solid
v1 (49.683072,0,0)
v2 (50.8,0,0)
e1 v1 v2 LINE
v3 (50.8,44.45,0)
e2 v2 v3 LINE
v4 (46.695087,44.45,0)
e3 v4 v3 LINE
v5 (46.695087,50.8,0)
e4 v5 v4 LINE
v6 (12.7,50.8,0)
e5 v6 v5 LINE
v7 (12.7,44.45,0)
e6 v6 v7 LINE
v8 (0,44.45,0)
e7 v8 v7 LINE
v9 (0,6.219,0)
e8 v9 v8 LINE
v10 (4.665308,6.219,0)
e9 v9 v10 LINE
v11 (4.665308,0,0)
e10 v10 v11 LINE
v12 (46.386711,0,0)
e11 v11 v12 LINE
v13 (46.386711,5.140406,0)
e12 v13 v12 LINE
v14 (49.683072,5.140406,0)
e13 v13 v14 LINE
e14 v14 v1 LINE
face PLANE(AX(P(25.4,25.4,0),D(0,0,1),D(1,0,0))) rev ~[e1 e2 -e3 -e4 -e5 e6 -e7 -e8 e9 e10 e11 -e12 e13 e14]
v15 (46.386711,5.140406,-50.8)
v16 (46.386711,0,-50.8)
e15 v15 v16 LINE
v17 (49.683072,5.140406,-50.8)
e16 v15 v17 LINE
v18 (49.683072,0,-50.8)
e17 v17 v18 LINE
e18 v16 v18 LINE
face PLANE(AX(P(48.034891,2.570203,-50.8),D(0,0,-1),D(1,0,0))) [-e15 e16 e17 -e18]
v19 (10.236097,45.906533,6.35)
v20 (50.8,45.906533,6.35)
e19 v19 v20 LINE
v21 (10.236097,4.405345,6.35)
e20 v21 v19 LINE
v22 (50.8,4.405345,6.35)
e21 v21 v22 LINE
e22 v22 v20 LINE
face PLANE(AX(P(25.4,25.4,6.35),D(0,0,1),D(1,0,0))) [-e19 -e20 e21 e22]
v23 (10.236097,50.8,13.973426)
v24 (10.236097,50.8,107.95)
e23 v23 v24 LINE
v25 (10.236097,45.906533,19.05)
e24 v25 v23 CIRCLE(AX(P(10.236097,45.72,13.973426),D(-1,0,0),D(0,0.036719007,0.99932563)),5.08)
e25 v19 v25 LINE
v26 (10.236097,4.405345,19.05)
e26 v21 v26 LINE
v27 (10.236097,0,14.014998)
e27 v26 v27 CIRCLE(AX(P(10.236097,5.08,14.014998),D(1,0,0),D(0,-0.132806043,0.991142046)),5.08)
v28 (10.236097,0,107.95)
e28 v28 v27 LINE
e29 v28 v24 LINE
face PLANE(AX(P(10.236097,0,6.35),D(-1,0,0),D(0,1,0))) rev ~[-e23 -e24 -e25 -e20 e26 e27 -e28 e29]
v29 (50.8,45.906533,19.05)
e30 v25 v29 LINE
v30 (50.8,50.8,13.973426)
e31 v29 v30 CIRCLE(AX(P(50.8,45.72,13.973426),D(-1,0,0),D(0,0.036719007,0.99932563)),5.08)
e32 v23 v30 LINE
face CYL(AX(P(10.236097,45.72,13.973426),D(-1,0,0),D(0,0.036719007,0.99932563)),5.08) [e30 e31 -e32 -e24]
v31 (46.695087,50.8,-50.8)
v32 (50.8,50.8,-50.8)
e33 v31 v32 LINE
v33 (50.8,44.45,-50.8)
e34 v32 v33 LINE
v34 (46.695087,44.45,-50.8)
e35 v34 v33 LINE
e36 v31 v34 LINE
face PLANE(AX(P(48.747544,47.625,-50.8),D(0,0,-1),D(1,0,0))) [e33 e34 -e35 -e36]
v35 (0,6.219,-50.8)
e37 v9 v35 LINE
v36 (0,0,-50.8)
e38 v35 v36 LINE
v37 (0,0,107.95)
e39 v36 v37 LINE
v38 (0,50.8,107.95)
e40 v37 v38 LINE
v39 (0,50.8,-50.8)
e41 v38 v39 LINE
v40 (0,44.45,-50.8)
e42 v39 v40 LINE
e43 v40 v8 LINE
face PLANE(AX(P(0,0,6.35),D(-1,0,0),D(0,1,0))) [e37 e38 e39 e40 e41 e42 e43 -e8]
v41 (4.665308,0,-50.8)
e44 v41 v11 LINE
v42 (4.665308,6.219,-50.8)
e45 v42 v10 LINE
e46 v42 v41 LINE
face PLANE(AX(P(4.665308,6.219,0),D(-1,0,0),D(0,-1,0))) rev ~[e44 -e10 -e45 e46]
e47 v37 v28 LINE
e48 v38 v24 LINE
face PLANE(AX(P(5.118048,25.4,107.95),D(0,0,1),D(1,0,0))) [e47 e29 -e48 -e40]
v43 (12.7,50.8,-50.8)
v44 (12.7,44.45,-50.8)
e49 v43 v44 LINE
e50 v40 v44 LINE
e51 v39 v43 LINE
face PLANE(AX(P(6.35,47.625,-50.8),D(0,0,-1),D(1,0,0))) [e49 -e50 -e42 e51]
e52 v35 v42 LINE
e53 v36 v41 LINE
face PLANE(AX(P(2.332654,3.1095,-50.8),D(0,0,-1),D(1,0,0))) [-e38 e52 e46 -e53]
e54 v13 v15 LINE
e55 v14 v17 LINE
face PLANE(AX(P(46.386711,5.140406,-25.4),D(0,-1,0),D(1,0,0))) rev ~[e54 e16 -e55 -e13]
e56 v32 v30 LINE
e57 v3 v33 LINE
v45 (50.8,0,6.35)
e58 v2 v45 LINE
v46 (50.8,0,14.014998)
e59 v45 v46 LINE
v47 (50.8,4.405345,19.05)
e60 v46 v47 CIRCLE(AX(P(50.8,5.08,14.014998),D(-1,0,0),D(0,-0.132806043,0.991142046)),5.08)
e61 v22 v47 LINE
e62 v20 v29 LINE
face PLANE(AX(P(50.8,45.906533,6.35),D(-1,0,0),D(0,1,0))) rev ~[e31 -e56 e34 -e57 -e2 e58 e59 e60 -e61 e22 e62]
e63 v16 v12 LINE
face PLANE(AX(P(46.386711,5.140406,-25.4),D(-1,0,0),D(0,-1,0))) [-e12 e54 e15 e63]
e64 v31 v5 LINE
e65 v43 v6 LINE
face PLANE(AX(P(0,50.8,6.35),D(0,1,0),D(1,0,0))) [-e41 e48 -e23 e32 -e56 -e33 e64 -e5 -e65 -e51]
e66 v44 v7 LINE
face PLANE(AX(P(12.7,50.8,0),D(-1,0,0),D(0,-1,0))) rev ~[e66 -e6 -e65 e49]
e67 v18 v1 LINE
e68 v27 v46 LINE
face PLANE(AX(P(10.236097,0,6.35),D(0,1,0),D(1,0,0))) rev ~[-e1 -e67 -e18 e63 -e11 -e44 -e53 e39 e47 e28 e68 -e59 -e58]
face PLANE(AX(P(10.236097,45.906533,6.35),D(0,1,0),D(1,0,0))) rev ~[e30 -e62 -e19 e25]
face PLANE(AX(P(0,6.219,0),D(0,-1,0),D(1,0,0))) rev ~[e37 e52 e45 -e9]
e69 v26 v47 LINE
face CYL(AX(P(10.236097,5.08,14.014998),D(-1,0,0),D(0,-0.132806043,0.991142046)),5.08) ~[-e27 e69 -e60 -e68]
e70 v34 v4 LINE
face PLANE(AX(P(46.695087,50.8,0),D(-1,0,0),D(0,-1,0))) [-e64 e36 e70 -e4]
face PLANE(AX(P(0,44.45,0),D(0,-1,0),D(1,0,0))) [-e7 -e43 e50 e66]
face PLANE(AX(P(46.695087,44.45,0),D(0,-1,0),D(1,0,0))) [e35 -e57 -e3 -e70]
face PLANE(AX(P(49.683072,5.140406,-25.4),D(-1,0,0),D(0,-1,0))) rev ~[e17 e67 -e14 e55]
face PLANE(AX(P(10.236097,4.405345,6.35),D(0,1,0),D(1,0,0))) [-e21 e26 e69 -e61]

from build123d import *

# Parameters (mm, degrees)
F0_W         = 50.8
F0_H         = 50.8
F1_DEPTH     = 6.35
F2_W         = 3.2963603735
F2_H         = 5.1404060796
F2_W_2       = 4.6653077006
F2_H_2       = 6.2190000899
F2_W_3       = 4.104912895
F2_H_3       = 6.35
F2_W_4       = 12.7
F3_DEPTH     = 25.4
F4_DEPTH     = 25.4
F5_W         = 10.2360965684
F5_H         = 50.8
F6_DEPTH     = 101.6
F7_W         = 40.5639034316
F7_H         = 4.4053453021
F8_DEPTH     = 12.7
F9_W         = 40.5639034316
F9_H         = 4.8934674442
F10_DEPTH    = 12.7
F11_T1_DEPTH = 53.1514074134
F12_T1_DEPTH = 53.255338931


# Not quite as in the source:
# - a fillet or chamfer that OpenCascade refuses, or shapes differently, is made with other operations: its cross-section is extruded or revolved along the edge and cut away or added


with BuildPart() as f1:
    # F0 (on Top) → F1 (new body)
    with BuildSketch(Plane.XY):
        with Locations((25.4, 25.4)):
            Rectangle(F0_W, F0_H)
    extrude(amount=F1_DEPTH)

    # F2 (on face) → F3 (join)
    with BuildSketch(Plane(origin=(0, 0, 0), x_dir=(1, 0, 0), z_dir=(0, 0, -1))):
        with Locations((48.0348914862, -2.5702030398)):
            Rectangle(F2_W, F2_H)
        with Locations((2.3326538503, -3.109500045)):
            Rectangle(F2_W_2, F2_H_2)
        with Locations((48.7475435525, -47.625)):
            Rectangle(F2_W_3, F2_H_3)
        with Locations((6.35, -47.625)):
            Rectangle(F2_W_4, F2_H_3)
    extrude(amount=F3_DEPTH)

    # F4 (add): faces of the model
    f4_faces = [f1.faces().sort_by_distance(p)[0] for p in [
        (48.0348914862, 2.5702030398, -25.4),
        (2.3326538503, 3.109500045, -25.4),
        (6.35, 47.625, -25.4),
        (48.7475435525, 47.625, -25.4),
    ]]
    extrude(f4_faces, amount=F4_DEPTH)

    # F5 (on face) → F6 (join)
    with BuildSketch(Plane.XY.offset(6.35)):
        with Locations((5.1180482842, 25.4)):
            Rectangle(F5_W, F5_H)
    extrude(amount=F6_DEPTH)

    # F7 (on face) → F8 (join)
    with BuildSketch(Plane.XY.offset(6.35)):
        with Locations((30.5180482842, 2.202672651)):
            Rectangle(F7_W, F7_H)
    extrude(amount=F8_DEPTH)

    # F9 (on face) → F10 (join)
    with BuildSketch(Plane.XY.offset(6.35)):
        with Locations((30.5180482842, 48.3532662779)):
            Rectangle(F9_W, F9_H)
    extrude(amount=F10_DEPTH)

    # F11: fillet of radius 5.08 on 1 edges, made by hand

    # F11_s2 → F11_t1 (cut)
    with BuildSketch(Plane.YZ.offset(10.2360965684)):
        with BuildLine():
            ThreePointArc((4.4053453021, 19.05), (1.2568046175, 17.3600809275), (0, 14.0149984073))
            Line((0, 14.0149984073), (0, 19.05))
            Line((0, 19.05), (4.4053453021, 19.05))
        make_face()
    extrude(amount=F11_T1_DEPTH, mode=Mode.SUBTRACT)

    # F12: fillet of radius 5.08 on 1 edges, made by hand

    # F12_s2 → F12_t1 (cut)
    with BuildSketch(Plane.YZ.offset(10.2360965684)):
        with BuildLine():
            ThreePointArc((45.9065325558, 19.05), (49.3774571346, 17.498962257), (50.8, 13.9734258002))
            Line((50.8, 13.9734258002), (50.8, 19.05))
            Line((50.8, 19.05), (45.9065325558, 19.05))
        make_face()
    extrude(amount=F12_T1_DEPTH, mode=Mode.SUBTRACT)


solid = f1.part
